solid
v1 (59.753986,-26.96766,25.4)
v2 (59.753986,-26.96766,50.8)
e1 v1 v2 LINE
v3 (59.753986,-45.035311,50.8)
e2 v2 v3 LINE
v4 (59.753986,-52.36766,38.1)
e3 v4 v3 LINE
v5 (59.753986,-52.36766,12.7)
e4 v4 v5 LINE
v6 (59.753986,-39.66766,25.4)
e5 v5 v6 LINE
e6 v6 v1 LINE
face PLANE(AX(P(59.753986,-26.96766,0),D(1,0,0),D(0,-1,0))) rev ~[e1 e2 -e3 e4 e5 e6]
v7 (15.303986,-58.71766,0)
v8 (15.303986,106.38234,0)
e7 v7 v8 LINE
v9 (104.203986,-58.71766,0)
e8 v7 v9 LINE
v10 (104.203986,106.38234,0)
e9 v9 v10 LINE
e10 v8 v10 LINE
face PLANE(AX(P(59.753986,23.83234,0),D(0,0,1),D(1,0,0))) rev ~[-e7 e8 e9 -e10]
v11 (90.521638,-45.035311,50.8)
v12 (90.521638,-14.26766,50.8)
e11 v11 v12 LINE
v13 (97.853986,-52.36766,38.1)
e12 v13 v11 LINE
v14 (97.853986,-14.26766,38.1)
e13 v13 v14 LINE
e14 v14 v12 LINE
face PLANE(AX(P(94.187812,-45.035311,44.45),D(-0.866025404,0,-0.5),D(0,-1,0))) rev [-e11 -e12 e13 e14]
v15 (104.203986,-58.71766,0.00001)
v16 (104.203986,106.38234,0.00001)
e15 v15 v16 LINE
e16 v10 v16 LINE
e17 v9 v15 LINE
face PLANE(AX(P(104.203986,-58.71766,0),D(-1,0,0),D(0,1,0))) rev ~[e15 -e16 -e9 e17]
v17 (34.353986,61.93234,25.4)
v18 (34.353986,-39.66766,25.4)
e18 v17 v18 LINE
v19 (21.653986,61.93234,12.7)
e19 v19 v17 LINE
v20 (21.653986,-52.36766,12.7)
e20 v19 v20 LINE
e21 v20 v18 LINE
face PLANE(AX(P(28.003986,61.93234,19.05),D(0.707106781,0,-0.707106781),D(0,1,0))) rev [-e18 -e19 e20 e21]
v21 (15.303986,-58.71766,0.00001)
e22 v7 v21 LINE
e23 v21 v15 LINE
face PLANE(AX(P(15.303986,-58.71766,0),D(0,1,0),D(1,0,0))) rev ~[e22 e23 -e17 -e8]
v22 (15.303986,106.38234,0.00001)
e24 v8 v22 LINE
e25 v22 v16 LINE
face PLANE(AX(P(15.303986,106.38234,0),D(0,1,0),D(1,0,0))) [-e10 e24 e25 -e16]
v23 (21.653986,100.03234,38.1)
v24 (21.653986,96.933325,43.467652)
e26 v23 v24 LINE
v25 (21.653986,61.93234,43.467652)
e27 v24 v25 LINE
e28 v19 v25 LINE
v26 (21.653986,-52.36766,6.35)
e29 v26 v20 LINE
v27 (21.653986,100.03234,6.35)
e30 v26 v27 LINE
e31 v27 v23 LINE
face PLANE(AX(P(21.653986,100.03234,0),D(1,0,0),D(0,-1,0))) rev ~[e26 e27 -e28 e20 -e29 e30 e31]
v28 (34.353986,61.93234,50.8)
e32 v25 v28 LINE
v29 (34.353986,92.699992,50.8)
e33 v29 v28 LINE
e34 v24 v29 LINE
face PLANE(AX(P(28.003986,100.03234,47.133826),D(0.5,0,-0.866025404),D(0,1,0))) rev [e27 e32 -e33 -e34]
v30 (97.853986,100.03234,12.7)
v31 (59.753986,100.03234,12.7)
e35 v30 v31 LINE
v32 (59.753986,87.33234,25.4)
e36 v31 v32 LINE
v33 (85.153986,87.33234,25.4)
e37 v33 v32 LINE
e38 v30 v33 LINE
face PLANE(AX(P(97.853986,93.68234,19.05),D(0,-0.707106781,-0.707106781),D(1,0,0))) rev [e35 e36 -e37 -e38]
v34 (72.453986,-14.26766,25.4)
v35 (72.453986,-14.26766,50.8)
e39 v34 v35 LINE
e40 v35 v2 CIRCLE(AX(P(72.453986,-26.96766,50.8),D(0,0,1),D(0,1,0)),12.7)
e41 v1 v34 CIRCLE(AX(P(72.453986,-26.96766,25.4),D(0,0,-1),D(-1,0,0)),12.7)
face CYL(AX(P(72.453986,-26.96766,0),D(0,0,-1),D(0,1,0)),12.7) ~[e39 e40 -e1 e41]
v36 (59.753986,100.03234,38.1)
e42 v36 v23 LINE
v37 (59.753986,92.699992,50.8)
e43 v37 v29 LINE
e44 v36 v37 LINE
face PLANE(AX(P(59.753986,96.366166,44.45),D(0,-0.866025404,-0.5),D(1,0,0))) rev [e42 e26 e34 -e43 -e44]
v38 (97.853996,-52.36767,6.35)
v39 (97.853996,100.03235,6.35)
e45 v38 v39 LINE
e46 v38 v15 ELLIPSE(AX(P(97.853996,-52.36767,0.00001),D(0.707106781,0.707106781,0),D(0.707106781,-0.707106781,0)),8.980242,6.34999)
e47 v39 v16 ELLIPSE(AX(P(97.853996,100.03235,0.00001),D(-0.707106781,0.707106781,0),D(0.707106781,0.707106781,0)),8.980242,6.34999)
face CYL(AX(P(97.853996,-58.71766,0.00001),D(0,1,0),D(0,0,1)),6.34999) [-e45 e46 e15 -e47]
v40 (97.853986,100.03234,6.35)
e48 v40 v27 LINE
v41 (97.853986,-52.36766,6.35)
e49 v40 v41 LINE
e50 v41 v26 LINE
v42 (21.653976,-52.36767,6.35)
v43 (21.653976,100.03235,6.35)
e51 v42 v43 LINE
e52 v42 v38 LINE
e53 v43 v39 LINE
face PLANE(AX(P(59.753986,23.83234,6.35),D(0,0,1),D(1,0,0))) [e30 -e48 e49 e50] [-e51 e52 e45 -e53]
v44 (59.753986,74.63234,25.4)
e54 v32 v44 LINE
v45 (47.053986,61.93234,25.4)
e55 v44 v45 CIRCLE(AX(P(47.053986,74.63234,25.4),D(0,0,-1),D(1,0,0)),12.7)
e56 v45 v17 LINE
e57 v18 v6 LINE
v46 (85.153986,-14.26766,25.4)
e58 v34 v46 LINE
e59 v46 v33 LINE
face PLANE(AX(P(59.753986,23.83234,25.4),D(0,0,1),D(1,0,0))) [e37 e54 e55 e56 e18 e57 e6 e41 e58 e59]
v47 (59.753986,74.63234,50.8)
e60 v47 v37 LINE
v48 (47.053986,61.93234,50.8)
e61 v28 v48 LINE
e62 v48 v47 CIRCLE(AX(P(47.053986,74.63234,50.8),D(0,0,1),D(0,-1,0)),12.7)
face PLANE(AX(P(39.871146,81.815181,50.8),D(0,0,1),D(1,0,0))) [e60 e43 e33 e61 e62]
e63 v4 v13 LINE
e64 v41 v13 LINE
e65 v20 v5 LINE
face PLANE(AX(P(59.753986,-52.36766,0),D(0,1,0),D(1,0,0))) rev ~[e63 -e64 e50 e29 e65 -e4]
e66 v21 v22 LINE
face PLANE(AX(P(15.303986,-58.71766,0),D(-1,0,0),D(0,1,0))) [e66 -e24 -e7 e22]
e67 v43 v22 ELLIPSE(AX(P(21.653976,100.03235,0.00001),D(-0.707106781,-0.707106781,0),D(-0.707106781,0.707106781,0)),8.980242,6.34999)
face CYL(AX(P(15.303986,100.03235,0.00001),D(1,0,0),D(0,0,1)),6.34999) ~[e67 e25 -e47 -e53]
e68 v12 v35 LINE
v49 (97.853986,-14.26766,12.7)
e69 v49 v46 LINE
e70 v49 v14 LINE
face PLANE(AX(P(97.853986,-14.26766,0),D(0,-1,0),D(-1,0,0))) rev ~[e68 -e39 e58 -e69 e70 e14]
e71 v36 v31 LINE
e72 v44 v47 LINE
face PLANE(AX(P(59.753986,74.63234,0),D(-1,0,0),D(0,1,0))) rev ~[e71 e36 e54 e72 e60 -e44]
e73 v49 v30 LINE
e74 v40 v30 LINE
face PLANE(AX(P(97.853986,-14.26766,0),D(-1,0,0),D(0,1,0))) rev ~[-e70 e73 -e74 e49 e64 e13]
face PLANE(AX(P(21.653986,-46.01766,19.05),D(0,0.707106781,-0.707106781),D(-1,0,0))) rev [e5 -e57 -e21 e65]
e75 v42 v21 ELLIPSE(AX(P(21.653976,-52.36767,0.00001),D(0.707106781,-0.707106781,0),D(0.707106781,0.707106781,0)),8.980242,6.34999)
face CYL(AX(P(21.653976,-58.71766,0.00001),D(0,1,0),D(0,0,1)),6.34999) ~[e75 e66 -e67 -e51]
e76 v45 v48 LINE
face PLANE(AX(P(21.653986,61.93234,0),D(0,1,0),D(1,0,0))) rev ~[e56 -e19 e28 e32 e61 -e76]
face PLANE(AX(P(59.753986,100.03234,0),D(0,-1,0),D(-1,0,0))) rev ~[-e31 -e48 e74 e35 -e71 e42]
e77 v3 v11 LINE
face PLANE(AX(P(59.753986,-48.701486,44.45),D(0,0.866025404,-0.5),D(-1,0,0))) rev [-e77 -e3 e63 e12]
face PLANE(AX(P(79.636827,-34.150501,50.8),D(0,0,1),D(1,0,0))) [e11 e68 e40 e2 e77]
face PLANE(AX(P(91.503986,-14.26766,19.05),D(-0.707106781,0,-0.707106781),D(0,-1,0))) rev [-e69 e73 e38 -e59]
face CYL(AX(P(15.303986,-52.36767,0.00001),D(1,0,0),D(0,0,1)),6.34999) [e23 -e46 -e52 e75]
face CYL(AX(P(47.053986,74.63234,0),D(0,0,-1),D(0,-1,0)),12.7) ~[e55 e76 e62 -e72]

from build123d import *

# Parameters (mm, degrees)
F0_W        = 88.9
F0_H        = 165.1
F1_DEPTH    = 6.35
F2_DEPTH    = 25.4
F3_DEPTH    = 50.8
F4_R        = 6.34999
F5_SIZE2    = 12.7
F5_SIZE     = 12.7
F6_C1_SIZE2 = 12.7
F6_C1_SIZE  = 7.3323484187
F6_C2_SIZE2 = 7.3323484187
F6_C2_SIZE  = 12.7
F6_C3_SIZE2 = 7.3323484187
F6_C3_SIZE  = 12.7
F6_C4_SIZE2 = 7.3323484187
F6_C4_SIZE  = 12.7


# Not quite as in the source:
# - a fillet or chamfer is up to 0.001 mm smaller than in the source, because OpenCascade refuses the exact size


with BuildPart() as f1:
    # F0 (on Top) → F1 (new body)
    with BuildSketch(Plane.XY):
        with Locations((59.7539862376, 23.8323401288)):
            Rectangle(F0_W, F0_H)
        Polygon((21.6539862376, 61.9323401288), (21.6539862376, 100.0323401288), (59.7539862376, 100.0323401288), (97.8539862376, 100.0323401288), (97.8539862376, -14.2676598712), (97.8539862376, -52.3676598712), (59.7539862376, -52.3676598712), (21.6539862376, -52.3676598712), align=None, mode=Mode.SUBTRACT)
    extrude(amount=F1_DEPTH)

    # F0 (on Top) → F2 (join)
    with BuildSketch(Plane.XY):
        with BuildLine():
            Line((97.8539862376, 100.0323401288), (59.7539862376, 100.0323401288))
            Line((59.7539862376, 100.0323401288), (59.7539862376, 74.6323401288))
            ThreePointArc((59.7539862376, 74.6323401288), (56.0342423587, 65.6520840077), (47.0539862376, 61.9323401288))
            Line((47.0539862376, 61.9323401288), (21.6539862376, 61.9323401288))
            Line((21.6539862376, 61.9323401288), (21.6539862376, -52.3676598712))
            Line((21.6539862376, -52.3676598712), (59.7539862376, -52.3676598712))
            Line((59.7539862376, -52.3676598712), (59.7539862376, -26.9676598712))
            ThreePointArc((59.7539862376, -26.9676598712), (63.4737301166, -17.9874037501), (72.4539862376, -14.2676598712))
            Line((72.4539862376, -14.2676598712), (97.8539862376, -14.2676598712))
            Line((97.8539862376, -14.2676598712), (97.8539862376, 100.0323401288))
        make_face()
    extrude(amount=F2_DEPTH)

    # F0 (on Top) → F3 (join)
    with BuildSketch(Plane.XY):
        with BuildLine():
            Line((59.7539862376, 100.0323401288), (21.6539862376, 100.0323401288))
            Line((21.6539862376, 100.0323401288), (21.6539862376, 61.9323401288))
            Line((21.6539862376, 61.9323401288), (47.0539862376, 61.9323401288))
            ThreePointArc((47.0539862376, 61.9323401288), (56.0342423587, 65.6520840077), (59.7539862376, 74.6323401288))
            Line((59.7539862376, 74.6323401288), (59.7539862376, 100.0323401288))
        make_face()
        with BuildLine():
            Line((97.8539862376, -52.3676598712), (97.8539862376, -14.2676598712))
            Line((97.8539862376, -14.2676598712), (72.4539862376, -14.2676598712))
            ThreePointArc((72.4539862376, -14.2676598712), (63.4737301166, -17.9874037501), (59.7539862376, -26.9676598712))
            Line((59.7539862376, -26.9676598712), (59.7539862376, -52.3676598712))
            Line((59.7539862376, -52.3676598712), (97.8539862376, -52.3676598712))
        make_face()
    extrude(amount=F3_DEPTH)

    # F4 (radius 6.35 in the source; OpenCascade refuses exactly that, so slightly less here)
    f4_edges = [f1.edges().sort_by_distance(p)[0] for p in [
        (15.303986, 23.83234, 6.35),
        (59.753986, 106.38234, 6.35),
        (59.753986, -58.71766, 6.35),
        (104.203986, 23.83234, 6.35),
    ]]
    fillet(f4_edges, radius=F4_R)

    # F5
    f5_edges = [f1.edges().sort_by_distance(p)[0] for p in [
        (21.653986, 4.78234, 25.4),
        (40.703986, -52.36766, 25.4),
        (97.853986, 42.88234, 25.4),
        (78.803986, 100.03234, 25.4),
    ]]
    chamfer(f5_edges, length=F5_SIZE, length2=F5_SIZE2)

    # F6: chamfer of 12.7 x 7.3323484187 on 4 edges, made by hand

    # F6_c1
    f6_c1_edges = [f1.edges().sort_by_distance(p)[0] for p in [
        (21.6539862376, 80.9823401288, 50.8),
    ]]
    f6_c1_side = f1.faces().sort_by_distance((21.6539862376, 80.9823401288, 50.6533530316))[0]
    chamfer(f6_c1_edges, length=F6_C1_SIZE, length2=F6_C1_SIZE2, reference=f6_c1_side)

    # F6_c2
    f6_c2_edges = [f1.edges().sort_by_distance(p)[0] for p in [
        (78.8039862376, -52.3676598712, 50.8),
    ]]
    f6_c2_side = f1.faces().sort_by_distance((78.8039862376, -52.3676598712, 50.6533530316))[0]
    chamfer(f6_c2_edges, length=F6_C2_SIZE, length2=F6_C2_SIZE2, reference=f6_c2_side)

    # F6_c3
    f6_c3_edges = [f1.edges().sort_by_distance(p)[0] for p in [
        (47.0539862376, 100.0323401288, 50.8),
    ]]
    f6_c3_side = f1.faces().sort_by_distance((47.0539862376, 100.0323401288, 50.6533530316))[0]
    chamfer(f6_c3_edges, length=F6_C3_SIZE, length2=F6_C3_SIZE2, reference=f6_c3_side)

    # F6_c4
    f6_c4_edges = [f1.edges().sort_by_distance(p)[0] for p in [
        (97.8539862376, -29.6514856618, 50.8),
    ]]
    f6_c4_side = f1.faces().sort_by_distance((97.8539862376, -29.6514856618, 50.6533530316))[0]
    chamfer(f6_c4_edges, length=F6_C4_SIZE, length2=F6_C4_SIZE2, reference=f6_c4_side)


solid = f1.part
